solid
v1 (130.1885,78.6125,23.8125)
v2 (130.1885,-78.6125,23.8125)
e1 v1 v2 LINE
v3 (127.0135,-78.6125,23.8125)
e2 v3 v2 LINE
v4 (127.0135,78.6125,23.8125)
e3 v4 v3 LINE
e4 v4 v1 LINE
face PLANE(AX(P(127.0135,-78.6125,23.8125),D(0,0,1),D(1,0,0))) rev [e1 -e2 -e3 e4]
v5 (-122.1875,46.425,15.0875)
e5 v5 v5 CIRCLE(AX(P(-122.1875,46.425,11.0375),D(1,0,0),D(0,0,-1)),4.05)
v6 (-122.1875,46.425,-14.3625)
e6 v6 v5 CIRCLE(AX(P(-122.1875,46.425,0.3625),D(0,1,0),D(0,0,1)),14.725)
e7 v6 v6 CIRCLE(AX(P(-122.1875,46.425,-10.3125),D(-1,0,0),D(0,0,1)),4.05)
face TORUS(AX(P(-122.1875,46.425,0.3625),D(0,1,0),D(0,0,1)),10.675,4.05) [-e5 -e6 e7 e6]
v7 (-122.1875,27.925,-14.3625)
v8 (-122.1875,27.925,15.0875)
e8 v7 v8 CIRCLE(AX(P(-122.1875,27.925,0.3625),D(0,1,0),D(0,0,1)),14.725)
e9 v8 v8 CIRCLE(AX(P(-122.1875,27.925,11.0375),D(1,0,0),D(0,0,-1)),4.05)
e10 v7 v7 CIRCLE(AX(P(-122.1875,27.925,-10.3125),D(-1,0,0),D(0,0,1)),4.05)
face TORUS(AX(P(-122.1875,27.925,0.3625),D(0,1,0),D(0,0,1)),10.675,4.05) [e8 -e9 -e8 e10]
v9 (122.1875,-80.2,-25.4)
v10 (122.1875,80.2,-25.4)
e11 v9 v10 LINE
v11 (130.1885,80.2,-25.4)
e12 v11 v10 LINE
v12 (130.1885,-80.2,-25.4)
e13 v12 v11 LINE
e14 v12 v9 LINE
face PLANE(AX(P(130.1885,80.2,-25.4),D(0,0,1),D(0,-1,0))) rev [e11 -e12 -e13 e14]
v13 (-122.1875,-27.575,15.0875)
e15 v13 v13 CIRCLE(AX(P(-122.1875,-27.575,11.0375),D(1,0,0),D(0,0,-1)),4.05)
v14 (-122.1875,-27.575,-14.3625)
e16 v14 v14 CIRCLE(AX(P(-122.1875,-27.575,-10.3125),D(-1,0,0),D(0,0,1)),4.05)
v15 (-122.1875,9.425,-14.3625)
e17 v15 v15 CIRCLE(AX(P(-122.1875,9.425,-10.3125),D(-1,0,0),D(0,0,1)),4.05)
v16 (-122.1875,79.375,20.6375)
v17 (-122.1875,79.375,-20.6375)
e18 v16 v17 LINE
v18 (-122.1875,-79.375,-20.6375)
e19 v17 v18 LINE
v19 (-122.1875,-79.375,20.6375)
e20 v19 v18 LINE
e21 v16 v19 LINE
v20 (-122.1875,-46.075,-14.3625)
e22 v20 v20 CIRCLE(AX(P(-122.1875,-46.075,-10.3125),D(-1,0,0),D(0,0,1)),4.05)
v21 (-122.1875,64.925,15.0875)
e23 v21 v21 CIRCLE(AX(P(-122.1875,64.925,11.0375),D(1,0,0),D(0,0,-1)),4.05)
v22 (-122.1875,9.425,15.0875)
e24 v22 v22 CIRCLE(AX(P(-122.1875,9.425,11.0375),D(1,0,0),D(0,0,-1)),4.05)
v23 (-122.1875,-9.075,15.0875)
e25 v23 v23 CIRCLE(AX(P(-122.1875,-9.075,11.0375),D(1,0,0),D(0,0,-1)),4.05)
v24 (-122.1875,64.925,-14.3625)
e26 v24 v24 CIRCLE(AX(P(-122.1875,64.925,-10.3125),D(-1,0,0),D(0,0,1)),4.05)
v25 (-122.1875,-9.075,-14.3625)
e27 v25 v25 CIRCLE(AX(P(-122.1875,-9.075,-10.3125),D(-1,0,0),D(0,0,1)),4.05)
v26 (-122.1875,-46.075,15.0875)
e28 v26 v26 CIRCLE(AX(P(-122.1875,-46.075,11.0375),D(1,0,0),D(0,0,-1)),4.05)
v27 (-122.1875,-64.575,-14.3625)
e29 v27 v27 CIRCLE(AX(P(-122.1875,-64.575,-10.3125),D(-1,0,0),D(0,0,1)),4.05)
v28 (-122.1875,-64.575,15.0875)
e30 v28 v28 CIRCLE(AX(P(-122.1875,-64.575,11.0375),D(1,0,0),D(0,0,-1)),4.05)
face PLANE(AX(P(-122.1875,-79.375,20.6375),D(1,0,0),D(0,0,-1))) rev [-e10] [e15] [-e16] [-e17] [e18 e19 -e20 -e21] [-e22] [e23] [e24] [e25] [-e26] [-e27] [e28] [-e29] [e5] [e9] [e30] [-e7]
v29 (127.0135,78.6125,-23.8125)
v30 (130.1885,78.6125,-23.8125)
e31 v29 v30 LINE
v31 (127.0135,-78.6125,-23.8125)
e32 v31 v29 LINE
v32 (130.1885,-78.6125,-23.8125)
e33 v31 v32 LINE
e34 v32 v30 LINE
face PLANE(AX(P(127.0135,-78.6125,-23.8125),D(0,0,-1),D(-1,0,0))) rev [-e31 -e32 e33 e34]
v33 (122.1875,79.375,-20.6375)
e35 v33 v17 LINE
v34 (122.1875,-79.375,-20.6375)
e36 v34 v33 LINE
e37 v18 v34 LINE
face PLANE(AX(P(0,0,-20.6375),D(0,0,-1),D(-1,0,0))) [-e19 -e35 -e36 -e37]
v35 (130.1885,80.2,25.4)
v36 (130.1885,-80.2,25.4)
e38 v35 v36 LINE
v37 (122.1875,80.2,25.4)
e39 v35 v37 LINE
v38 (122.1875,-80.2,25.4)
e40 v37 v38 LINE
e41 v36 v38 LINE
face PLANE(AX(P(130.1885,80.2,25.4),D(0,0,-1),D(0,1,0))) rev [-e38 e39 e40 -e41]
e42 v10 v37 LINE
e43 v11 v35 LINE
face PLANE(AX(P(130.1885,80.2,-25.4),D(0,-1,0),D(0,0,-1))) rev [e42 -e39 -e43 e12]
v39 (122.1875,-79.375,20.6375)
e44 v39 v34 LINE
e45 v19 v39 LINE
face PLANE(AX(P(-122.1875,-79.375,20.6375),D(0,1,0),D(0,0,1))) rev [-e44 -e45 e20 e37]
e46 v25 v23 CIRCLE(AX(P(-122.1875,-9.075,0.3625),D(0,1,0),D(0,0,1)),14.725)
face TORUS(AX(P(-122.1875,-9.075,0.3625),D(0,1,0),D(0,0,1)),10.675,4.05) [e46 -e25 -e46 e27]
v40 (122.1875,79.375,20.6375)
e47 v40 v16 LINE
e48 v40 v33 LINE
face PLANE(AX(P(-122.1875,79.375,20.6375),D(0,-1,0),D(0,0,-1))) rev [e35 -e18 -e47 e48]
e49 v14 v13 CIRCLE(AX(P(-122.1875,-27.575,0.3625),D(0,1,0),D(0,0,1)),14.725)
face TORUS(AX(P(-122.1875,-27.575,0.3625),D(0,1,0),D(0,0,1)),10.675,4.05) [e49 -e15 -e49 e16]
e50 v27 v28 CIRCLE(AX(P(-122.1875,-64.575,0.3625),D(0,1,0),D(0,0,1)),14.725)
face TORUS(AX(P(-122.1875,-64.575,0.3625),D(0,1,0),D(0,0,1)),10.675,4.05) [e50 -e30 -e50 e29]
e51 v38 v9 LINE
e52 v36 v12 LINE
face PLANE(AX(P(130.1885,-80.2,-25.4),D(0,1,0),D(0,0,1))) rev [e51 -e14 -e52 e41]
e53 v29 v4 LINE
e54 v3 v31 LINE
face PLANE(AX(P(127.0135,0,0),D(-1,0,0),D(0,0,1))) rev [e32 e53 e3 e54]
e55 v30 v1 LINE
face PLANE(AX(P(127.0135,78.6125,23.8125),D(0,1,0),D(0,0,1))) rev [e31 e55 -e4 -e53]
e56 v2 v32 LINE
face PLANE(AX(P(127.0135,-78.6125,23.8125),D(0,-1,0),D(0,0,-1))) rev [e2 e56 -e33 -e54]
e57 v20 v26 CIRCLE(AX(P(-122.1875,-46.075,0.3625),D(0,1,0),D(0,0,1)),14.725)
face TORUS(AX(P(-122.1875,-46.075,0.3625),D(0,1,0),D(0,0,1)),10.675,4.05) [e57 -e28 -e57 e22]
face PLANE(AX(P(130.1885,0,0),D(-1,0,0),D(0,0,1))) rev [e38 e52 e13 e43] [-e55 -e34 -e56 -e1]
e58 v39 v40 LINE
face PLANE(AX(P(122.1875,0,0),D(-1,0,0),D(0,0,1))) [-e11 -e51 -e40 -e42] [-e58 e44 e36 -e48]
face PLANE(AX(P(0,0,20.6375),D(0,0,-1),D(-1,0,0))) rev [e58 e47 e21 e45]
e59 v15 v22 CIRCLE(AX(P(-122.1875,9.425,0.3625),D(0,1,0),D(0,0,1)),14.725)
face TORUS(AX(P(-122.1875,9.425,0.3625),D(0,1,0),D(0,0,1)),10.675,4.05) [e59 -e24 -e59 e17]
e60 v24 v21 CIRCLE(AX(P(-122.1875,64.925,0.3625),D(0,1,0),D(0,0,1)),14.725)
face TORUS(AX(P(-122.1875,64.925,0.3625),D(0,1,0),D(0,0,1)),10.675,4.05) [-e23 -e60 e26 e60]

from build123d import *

# Parameters (mm, degrees)
SKETCH1_W           = 244.375
SKETCH1_H           = 158.75
BOSS_EXTRUDE1_DEPTH = 20.6375
SKETCH4_W           = 50.8
SKETCH4_H           = 160.4
BOSS_EXTRUDE2_DEPTH = 8.001
SWEEP1_OUTLINE_R    = 4.05
SKETCH5_W           = 47.625
SKETCH5_H           = 157.225
CUT_EXTRUDE1_DEPTH  = 3.175
LPATTERN1_COUNT     = 8
LPATTERN1_PITCH     = 18.5


# Read off the part's stored shape, not the designer's step: Sweep1
with BuildPart() as part:
    # Sketch1 → Boss-Extrude1 (new, symmetric)
    with BuildSketch(Plane.XY):
        Rectangle(SKETCH1_W, SKETCH1_H)
    extrude(amount=BOSS_EXTRUDE1_DEPTH, both=True)

    # Sketch4 → Boss-Extrude2 (add)
    with BuildSketch(Plane(origin=(122.1875, 0, 0), x_dir=(0, 0, -1), z_dir=(1, 0, 0))):
        Rectangle(SKETCH4_W, SKETCH4_H)
    extrude(amount=BOSS_EXTRUDE2_DEPTH)

    # Sweep1 outline → Sweep1 (revolve)
    with BuildSketch(Plane(origin=(-122.1875, 0, 0.3625), x_dir=(1, 0, 0), z_dir=(0, 0, 1))):
        with Locations((10.675, 64.925)):
            Circle(SWEEP1_OUTLINE_R)
    sweep1 = revolve(axis=Axis((-122.1875, 0, 0.3625), (0, 1, 0)))

    # Sketch5 → Cut-Extrude1 (cut)
    with BuildSketch(Plane(origin=(130.1885, 0, 0), x_dir=(0, 0, -1), z_dir=(1, 0, 0))):
        Rectangle(SKETCH5_W, SKETCH5_H)
    extrude(amount=-CUT_EXTRUDE1_DEPTH, mode=Mode.SUBTRACT)

    # LPattern1: Sweep1 ×8
    with Locations(*[(0, -i * LPATTERN1_PITCH, 0) for i in range(1, LPATTERN1_COUNT)]):
        add(sweep1)


solid = part.part
